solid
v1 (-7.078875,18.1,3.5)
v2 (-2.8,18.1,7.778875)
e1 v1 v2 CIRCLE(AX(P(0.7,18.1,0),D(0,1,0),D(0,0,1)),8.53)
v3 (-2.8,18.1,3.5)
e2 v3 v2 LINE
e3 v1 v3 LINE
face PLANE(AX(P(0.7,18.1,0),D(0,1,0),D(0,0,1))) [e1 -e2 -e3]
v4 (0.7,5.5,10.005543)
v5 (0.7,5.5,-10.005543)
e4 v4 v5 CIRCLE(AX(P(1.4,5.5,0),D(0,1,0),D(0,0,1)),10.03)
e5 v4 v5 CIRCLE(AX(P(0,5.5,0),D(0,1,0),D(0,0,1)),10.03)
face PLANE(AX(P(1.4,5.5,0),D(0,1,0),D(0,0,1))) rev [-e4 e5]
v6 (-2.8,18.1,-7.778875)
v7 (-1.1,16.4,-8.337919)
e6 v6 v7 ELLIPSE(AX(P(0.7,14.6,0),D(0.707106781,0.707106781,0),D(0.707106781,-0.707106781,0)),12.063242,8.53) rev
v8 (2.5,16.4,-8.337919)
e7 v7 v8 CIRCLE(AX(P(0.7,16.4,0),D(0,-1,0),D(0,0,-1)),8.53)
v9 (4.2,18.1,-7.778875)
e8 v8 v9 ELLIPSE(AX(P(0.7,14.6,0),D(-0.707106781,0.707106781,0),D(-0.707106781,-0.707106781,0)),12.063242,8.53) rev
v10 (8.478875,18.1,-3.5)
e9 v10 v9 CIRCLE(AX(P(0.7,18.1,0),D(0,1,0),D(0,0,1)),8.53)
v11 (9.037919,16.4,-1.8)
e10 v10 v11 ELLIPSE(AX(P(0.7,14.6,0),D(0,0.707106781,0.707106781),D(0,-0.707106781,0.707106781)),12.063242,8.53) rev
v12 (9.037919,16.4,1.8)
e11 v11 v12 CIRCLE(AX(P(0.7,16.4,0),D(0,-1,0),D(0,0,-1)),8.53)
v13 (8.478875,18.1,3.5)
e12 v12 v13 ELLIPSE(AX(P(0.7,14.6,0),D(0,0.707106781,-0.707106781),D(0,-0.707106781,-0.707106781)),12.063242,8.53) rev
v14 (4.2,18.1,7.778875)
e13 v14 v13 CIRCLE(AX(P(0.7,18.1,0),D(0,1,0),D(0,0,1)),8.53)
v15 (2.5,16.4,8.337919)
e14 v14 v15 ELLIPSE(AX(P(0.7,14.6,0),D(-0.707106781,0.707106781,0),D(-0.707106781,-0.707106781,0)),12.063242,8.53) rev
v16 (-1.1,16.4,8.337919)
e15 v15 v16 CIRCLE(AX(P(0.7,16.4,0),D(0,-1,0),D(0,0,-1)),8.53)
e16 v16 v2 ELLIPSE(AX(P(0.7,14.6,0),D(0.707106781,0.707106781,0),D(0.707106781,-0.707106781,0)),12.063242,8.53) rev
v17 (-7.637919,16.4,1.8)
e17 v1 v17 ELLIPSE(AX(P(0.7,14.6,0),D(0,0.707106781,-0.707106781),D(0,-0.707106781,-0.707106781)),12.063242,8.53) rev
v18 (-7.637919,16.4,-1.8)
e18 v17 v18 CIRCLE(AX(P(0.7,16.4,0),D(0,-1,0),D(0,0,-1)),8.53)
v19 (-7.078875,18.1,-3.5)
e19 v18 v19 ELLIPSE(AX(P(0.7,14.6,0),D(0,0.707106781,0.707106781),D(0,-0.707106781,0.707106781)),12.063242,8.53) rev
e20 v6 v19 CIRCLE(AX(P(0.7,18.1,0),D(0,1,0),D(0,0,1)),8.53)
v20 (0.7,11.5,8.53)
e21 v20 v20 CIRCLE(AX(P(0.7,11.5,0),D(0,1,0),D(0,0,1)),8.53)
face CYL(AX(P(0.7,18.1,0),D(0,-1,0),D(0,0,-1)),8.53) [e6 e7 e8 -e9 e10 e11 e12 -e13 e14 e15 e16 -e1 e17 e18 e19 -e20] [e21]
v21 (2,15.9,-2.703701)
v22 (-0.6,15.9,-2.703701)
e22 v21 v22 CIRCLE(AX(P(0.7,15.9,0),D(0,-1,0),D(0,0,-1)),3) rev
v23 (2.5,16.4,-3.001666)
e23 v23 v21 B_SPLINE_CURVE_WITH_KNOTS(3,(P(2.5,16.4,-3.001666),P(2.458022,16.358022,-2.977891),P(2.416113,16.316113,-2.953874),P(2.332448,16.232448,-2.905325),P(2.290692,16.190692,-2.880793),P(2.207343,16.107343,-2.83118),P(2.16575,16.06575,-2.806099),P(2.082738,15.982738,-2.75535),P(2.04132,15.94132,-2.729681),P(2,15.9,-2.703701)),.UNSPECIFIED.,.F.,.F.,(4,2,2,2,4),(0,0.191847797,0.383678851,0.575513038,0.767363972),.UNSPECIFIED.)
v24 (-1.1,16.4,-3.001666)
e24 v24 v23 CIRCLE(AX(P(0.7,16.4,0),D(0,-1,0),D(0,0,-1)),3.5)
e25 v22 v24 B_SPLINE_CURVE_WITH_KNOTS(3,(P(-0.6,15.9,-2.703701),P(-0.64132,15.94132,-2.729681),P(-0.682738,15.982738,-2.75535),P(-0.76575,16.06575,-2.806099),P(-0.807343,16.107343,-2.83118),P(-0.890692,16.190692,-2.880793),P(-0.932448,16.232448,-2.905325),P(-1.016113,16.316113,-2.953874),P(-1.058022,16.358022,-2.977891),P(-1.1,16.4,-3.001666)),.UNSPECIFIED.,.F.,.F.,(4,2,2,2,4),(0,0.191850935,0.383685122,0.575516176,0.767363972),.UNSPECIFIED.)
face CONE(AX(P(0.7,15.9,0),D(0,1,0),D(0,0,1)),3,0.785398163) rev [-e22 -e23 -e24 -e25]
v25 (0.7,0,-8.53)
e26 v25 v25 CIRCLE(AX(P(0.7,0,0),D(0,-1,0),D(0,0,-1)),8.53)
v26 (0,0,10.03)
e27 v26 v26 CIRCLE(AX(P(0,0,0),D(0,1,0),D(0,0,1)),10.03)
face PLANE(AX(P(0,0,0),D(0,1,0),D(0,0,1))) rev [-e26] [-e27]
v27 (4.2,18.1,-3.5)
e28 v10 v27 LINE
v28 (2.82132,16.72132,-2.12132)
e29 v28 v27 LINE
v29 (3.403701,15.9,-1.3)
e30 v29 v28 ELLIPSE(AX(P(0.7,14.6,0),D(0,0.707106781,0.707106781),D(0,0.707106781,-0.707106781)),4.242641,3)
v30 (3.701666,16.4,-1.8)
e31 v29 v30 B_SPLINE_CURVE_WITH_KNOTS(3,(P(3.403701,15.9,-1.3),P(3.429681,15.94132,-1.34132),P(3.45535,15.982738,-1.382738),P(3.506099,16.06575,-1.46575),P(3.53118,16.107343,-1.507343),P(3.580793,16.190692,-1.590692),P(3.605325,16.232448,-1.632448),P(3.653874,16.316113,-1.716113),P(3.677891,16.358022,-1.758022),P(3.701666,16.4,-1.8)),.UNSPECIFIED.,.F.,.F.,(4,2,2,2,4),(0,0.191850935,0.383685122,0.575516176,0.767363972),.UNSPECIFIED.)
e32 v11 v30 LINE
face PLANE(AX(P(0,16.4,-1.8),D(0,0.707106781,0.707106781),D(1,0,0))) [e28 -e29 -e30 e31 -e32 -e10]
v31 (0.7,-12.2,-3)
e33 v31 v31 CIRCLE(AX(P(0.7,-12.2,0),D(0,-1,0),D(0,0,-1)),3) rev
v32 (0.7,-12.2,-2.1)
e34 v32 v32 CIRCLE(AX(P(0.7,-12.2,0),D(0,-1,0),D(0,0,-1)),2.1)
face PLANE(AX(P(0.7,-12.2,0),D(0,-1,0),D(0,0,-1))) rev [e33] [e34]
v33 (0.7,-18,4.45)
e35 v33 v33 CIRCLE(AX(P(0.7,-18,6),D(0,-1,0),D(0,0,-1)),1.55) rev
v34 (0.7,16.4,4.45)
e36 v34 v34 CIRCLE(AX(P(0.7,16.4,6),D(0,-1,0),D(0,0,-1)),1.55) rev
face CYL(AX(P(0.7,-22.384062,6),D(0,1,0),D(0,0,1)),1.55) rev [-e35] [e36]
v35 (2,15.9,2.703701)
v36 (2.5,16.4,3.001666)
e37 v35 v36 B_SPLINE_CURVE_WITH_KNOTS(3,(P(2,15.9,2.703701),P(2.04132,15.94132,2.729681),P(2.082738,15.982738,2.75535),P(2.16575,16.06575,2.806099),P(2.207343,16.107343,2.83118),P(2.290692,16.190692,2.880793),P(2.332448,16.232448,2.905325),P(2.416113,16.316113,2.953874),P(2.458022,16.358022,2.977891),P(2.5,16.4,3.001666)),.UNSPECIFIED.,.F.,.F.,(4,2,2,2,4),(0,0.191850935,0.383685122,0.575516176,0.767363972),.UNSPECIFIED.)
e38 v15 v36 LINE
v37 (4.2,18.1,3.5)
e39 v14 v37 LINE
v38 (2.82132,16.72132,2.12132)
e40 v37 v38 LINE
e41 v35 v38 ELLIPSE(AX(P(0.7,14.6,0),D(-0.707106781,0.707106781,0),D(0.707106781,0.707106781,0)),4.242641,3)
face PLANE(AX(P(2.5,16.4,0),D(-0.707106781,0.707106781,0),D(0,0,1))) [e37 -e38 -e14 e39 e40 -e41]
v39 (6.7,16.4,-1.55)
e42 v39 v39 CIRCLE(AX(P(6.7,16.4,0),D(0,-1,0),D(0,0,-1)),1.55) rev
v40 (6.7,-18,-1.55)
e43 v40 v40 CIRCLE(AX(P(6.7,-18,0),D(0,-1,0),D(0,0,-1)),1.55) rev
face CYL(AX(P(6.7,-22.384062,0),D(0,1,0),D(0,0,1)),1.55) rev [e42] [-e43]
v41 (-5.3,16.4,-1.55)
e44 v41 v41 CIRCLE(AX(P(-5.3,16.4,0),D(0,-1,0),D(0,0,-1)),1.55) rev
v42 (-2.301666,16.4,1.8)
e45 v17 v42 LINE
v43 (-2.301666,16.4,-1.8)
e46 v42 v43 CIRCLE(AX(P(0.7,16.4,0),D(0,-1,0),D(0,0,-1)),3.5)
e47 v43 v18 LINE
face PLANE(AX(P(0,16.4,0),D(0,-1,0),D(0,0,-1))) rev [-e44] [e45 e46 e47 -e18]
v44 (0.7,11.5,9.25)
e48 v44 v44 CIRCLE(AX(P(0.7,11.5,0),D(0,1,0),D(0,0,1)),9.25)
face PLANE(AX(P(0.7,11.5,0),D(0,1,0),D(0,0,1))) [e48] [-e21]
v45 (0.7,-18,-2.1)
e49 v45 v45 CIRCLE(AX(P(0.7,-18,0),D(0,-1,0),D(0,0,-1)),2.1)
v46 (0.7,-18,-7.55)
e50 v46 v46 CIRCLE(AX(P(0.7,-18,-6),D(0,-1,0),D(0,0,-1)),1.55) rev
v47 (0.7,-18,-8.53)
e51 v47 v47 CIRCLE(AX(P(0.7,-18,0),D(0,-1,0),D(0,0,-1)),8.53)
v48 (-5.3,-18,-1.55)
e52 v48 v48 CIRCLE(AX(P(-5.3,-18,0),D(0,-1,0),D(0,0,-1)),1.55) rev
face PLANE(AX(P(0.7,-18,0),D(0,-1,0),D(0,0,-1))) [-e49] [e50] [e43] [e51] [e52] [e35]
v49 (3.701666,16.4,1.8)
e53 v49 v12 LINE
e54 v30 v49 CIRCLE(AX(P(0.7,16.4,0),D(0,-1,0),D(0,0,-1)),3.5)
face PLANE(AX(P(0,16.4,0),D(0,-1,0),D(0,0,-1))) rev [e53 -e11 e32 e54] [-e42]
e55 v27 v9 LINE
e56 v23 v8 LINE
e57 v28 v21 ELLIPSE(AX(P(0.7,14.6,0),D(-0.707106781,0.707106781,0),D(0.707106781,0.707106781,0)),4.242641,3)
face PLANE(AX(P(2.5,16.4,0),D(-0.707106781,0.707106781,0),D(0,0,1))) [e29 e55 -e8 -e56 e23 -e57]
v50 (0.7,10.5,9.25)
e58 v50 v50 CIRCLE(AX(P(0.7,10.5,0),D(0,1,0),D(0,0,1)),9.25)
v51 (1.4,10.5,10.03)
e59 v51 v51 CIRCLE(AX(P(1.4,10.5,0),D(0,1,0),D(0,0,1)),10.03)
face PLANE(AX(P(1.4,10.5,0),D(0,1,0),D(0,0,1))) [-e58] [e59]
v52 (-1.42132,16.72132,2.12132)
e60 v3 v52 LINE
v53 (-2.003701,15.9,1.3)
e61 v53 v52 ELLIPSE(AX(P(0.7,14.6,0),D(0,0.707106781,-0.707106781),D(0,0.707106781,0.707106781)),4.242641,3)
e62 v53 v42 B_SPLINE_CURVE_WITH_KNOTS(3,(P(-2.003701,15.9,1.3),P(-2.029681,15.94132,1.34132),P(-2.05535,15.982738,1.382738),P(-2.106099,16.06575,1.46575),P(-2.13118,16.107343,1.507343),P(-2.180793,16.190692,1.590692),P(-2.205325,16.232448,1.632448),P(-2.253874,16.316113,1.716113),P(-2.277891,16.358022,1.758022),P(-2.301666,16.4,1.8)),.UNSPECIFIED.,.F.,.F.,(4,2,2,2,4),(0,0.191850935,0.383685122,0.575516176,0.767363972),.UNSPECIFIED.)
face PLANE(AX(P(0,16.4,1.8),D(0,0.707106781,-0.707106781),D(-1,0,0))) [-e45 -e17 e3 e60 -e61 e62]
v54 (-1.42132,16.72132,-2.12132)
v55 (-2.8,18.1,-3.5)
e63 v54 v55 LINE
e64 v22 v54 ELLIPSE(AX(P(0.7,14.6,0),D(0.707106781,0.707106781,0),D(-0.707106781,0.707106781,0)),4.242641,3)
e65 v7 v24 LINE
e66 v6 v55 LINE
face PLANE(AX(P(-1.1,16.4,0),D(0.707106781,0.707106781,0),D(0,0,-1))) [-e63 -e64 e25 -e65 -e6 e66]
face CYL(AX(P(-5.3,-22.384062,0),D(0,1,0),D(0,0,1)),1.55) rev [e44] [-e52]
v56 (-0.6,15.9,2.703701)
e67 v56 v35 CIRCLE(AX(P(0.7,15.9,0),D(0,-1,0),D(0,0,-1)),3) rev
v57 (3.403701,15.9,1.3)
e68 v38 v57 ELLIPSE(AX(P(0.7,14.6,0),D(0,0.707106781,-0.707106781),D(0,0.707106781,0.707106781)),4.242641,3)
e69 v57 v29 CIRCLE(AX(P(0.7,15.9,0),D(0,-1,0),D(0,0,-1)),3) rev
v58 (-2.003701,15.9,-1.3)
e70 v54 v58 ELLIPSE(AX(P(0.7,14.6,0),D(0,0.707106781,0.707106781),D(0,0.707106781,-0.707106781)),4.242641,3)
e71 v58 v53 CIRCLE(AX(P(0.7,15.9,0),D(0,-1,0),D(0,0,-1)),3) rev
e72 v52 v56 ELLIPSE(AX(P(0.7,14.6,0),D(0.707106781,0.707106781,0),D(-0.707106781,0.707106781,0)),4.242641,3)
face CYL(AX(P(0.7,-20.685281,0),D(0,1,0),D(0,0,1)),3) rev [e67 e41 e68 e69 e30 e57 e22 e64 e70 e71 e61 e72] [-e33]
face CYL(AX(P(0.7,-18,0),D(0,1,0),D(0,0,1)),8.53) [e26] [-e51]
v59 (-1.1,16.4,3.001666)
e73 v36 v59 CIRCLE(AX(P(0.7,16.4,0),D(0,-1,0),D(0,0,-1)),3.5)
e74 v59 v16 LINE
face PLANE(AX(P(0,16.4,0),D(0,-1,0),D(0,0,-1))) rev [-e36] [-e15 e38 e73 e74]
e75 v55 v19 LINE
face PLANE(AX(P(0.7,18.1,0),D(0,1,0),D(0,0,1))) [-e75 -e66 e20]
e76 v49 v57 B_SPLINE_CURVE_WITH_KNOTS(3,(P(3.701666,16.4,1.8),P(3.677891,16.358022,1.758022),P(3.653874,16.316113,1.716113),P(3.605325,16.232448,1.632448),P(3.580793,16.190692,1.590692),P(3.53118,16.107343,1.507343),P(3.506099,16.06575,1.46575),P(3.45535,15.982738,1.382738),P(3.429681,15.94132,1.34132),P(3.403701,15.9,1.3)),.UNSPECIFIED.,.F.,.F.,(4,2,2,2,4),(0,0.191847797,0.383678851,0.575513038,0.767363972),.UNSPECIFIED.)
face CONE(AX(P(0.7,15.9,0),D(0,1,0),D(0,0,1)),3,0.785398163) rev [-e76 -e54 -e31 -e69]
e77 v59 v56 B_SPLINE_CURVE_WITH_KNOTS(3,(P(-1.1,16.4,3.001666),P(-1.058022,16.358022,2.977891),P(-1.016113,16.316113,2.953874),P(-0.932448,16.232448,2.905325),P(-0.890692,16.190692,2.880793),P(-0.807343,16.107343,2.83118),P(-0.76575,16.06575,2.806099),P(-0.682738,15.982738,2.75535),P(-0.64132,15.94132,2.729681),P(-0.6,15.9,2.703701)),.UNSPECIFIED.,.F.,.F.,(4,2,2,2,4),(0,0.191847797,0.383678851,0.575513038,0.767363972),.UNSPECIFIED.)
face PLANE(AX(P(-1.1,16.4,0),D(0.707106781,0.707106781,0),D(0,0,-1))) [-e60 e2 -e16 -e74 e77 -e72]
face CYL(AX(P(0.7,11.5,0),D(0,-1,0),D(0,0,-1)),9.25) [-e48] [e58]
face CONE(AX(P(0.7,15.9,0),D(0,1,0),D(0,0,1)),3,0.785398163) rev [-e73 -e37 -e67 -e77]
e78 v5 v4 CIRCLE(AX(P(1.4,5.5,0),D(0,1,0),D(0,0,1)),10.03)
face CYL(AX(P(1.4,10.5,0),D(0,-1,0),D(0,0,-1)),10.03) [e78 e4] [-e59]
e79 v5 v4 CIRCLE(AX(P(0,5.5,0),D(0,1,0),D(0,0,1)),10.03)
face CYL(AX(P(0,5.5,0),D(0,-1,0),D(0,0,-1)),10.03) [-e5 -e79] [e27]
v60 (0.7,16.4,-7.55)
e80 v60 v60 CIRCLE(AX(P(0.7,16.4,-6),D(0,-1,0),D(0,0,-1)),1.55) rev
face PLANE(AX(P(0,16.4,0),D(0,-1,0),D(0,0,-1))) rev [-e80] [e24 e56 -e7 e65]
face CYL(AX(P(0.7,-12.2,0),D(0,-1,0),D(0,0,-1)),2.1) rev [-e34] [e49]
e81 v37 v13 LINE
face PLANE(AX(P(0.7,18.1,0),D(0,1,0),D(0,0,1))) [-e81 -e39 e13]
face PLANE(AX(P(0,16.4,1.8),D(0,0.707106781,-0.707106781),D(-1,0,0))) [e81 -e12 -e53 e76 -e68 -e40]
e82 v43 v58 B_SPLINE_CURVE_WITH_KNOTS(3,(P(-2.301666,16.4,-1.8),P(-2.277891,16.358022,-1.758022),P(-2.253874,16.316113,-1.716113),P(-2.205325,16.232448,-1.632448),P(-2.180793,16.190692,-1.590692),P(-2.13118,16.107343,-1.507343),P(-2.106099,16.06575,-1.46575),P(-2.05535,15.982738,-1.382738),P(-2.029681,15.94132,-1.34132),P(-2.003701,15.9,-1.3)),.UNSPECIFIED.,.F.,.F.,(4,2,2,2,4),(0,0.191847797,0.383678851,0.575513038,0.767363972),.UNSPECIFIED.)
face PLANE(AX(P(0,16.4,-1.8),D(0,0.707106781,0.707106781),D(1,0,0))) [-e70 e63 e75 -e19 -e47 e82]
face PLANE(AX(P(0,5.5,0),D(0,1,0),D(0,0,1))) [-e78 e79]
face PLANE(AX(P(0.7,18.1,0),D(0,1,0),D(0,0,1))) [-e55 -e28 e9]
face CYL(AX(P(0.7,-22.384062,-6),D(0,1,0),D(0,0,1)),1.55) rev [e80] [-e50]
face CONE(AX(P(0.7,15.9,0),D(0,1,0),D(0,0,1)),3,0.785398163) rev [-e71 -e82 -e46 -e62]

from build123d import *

# Parameters (mm, degrees)
SKETCH1_R            = 10.03
BOSS_EXTRUDE11_DEPTH = 5.5
SKETCH20_R           = 10.03
BOSS_EXTRUDE12_DEPTH = 5
SKETCH21_R           = 9.25
BOSS_EXTRUDE13_DEPTH = 1
SKETCH22_R           = 8.53
BOSS_EXTRUDE14_DEPTH = 6.6
BOSS_EXTRUDE15_START = 18
SKETCH30_R           = 8.53
BOSS_EXTRUDE15_DEPTH = 18
SKETCH31_R           = 1.55
CUT_EXTRUDE12_DEPTH  = 36.1
SKETCH33_R           = 2.1
CUT_EXTRUDE14_DEPTH  = 5.8
SKETCH36_R           = 3
CUT_EXTRUDE18_DEPTH  = 30.3
SKETCH37_W           = 9.5
SKETCH37_H           = 7
CUT_EXTRUDE19_DEPTH  = 1.7
CIRPATTERN1_COUNT    = 4
CHAMFER1_SIZE        = 1.7
CHAMFER2_SIZE        = 0.5


with BuildPart() as part:
    # Sketch1 → Boss-Extrude11 (new body)
    with BuildSketch(Plane(origin=(0, 0, 0), x_dir=(1, 0, 0), z_dir=(0, 1, 0))):
        with Locations(Location((0, 0, 0), (0, 0, 270))):
            Circle(SKETCH1_R)
    extrude(amount=BOSS_EXTRUDE11_DEPTH)

    # Sketch20 → Boss-Extrude12 (add)
    with BuildSketch(Plane(origin=(0, 5.5, 0), x_dir=(1, 0, 0), z_dir=(0, 1, 0))):
        with Locations(Location((1.4, 0, 0), (0, 0, 94.001961682))):
            Circle(SKETCH20_R)
    extrude(amount=BOSS_EXTRUDE12_DEPTH)

    # Sketch21 → Boss-Extrude13 (add)
    with BuildSketch(Plane(origin=(0, 10.5, 0), x_dir=(1, 0, 0), z_dir=(0, 1, 0))):
        with Locations(Location((0.7, 0, 0), (0, 0, 270))):
            Circle(SKETCH21_R)
    extrude(amount=BOSS_EXTRUDE13_DEPTH)

    # Sketch22 → Boss-Extrude14 (add)
    with BuildSketch(Plane(origin=(0, 11.5, 0), x_dir=(1, 0, 0), z_dir=(0, 1, 0))):
        with Locations(Location((0.7, 0, 0), (0, 0, 270))):
            Circle(SKETCH22_R)
    extrude(amount=BOSS_EXTRUDE14_DEPTH)

    # Sketch30 → Boss-Extrude15 (add)
    with BuildSketch(Plane.XZ.offset(BOSS_EXTRUDE15_START)):
        with Locations(Location((0.7, 0, 0), (0, 0, 90))):
            Circle(SKETCH30_R)
    extrude(amount=-BOSS_EXTRUDE15_DEPTH)

    # Sketch31 → Cut-Extrude12 (cut)
    with BuildSketch(Plane(origin=(0, 18.1, 0), x_dir=(1, 0, 0), z_dir=(0, 1, 0))):
        with Locations(Location((6.7, 0, 0), (0, 0, 270))):
            Circle(SKETCH31_R)
    cut_extrude12 = extrude(amount=-CUT_EXTRUDE12_DEPTH, mode=Mode.SUBTRACT)

    # Sketch33 → Cut-Extrude14 (cut)
    with BuildSketch(Plane.XZ.offset(18)):
        with Locations(Location((0.7, 0, 0), (0, 0, 270))):
            Circle(SKETCH33_R)
    extrude(amount=-CUT_EXTRUDE14_DEPTH, mode=Mode.SUBTRACT)

    # Sketch36 → Cut-Extrude18 (cut)
    with BuildSketch(Plane(origin=(0, 18.1, 0), x_dir=(1, 0, 0), z_dir=(0, 1, 0))):
        with Locations(Location((0.7, 0, 0), (0, 0, 270))):
            Circle(SKETCH36_R)
    extrude(amount=-CUT_EXTRUDE18_DEPTH, mode=Mode.SUBTRACT)

    # Sketch37 → Cut-Extrude19 (cut)
    with BuildSketch(Plane(origin=(0, 18.1, 0), x_dir=(1, 0, 0), z_dir=(0, 1, 0))):
        with Locations((5.45, 0)):
            Rectangle(SKETCH37_W, SKETCH37_H)
    cut_extrude19 = extrude(amount=-CUT_EXTRUDE19_DEPTH, mode=Mode.SUBTRACT)

    # CirPattern1: Cut-Extrude12, Cut-Extrude19 ×4 about axis
    cirpattern1_axis = Axis((0.7, 0, 0), (0, 1, 0))
    add([cut_extrude12.rotate(cirpattern1_axis, i * 360 / CIRPATTERN1_COUNT) for i in range(1, CIRPATTERN1_COUNT)], mode=Mode.SUBTRACT)
    add([cut_extrude19.rotate(cirpattern1_axis, i * 360 / CIRPATTERN1_COUNT) for i in range(1, CIRPATTERN1_COUNT)], mode=Mode.SUBTRACT)

    # Chamfer1
    # the kernel refuses this chamfer: 1.7 mm, written as the material it adds along each edge
    with BuildSketch(Plane(origin=(12.85073632, 16.4, -3.5), x_dir=(0, 0.9996219169112968, -0.027495876610586365), z_dir=(-1, 0, 0))) as chamfer1_piece_1_section:
        Polygon((CHAMFER1_SIZE * 0.999621916911, -CHAMFER1_SIZE * 0.0274958766106), (-CHAMFER1_SIZE * 0.0274958766106, -CHAMFER1_SIZE * 0.999621916911), (0, 0), align=None)
    chamfer1_piece_1 = extrude(amount=8.65073632, mode=Mode.PRIVATE)
    chamfer1_piece_1 = chamfer1_piece_1 & Plane(origin=(0.7, 16.951076754, 0), x_dir=(0, 0, 1), z_dir=(0, -1, 0)) * Cylinder(8.53, 25, mode=Mode.PRIVATE)
    chamfer1_piece_1 = split(chamfer1_piece_1, bisect_by=Plane(origin=(6.450066767, 18.1, -2.924017163), z_dir=(0, -1, 0)), keep=Keep.TOP, mode=Mode.PRIVATE)
    add(chamfer1_piece_1)
    with BuildSketch(Plane(origin=(4.2, 16.4, 3.5), x_dir=(0, 0.9996219169112968, 0.027495876610581792), z_dir=(1, 0, 0))) as chamfer1_piece_2_section:
        Polygon((CHAMFER1_SIZE * 0.999621916911, -CHAMFER1_SIZE * 0.0274958766106), (-CHAMFER1_SIZE * 0.0274958766106, -CHAMFER1_SIZE * 0.999621916911), (0, 0), align=None)
    chamfer1_piece_2 = extrude(amount=8.65073632, mode=Mode.PRIVATE)
    chamfer1_piece_2 = chamfer1_piece_2 & Plane(origin=(0.7, 16.951076754, 0), x_dir=(0, 0, 1), z_dir=(0, -1, 0)) * Cylinder(8.53, 25, mode=Mode.PRIVATE)
    chamfer1_piece_2 = split(chamfer1_piece_2, bisect_by=Plane(origin=(6.450066768, 18.1, 2.924017163), z_dir=(0, -1, 0)), keep=Keep.TOP, mode=Mode.PRIVATE)
    add(chamfer1_piece_2)
    with BuildSketch(Plane(origin=(-2.8, 16.4, -12.15073632), x_dir=(-0.027495876610586365, 0.9996219169112968, 0), z_dir=(0, 0, 1))) as chamfer1_piece_3_section:
        Polygon((CHAMFER1_SIZE * 0.999621916911, -CHAMFER1_SIZE * 0.0274958766106), (-CHAMFER1_SIZE * 0.0274958766106, -CHAMFER1_SIZE * 0.999621916911), (0, 0), align=None)
    chamfer1_piece_3 = extrude(amount=8.65073632, mode=Mode.PRIVATE)
    chamfer1_piece_3 = chamfer1_piece_3 & Plane(origin=(0.7, 16.951076754, 0), x_dir=(0, 0, 1), z_dir=(0, -1, 0)) * Cylinder(8.53, 25, mode=Mode.PRIVATE)
    chamfer1_piece_3 = split(chamfer1_piece_3, bisect_by=Plane(origin=(-2.224017163, 18.1, -5.750066767), z_dir=(0, -1, 0)), keep=Keep.TOP, mode=Mode.PRIVATE)
    add(chamfer1_piece_3)
    with BuildSketch(Plane(origin=(-2.8, 16.4, -3.5), x_dir=(0, 0.9996219169112968, -0.027495876610586365), z_dir=(-1, 0, 0))) as chamfer1_piece_4_section:
        Polygon((CHAMFER1_SIZE * 0.999621916911, -CHAMFER1_SIZE * 0.0274958766106), (-CHAMFER1_SIZE * 0.0274958766106, -CHAMFER1_SIZE * 0.999621916911), (0, 0), align=None)
    chamfer1_piece_4 = extrude(amount=8.65073632, mode=Mode.PRIVATE)
    chamfer1_piece_4 = chamfer1_piece_4 & Plane(origin=(0.7, 16.951076754, 0), x_dir=(0, 0, 1), z_dir=(0, -1, 0)) * Cylinder(8.53, 25, mode=Mode.PRIVATE)
    chamfer1_piece_4 = split(chamfer1_piece_4, bisect_by=Plane(origin=(-5.050066768, 18.1, -2.924017163), z_dir=(0, -1, 0)), keep=Keep.TOP, mode=Mode.PRIVATE)
    add(chamfer1_piece_4)
    with BuildSketch(Plane(origin=(-11.45073632, 16.4, 3.5), x_dir=(0, 0.9996219169112968, 0.027495876610586365), z_dir=(1, 0, 0))) as chamfer1_piece_5_section:
        Polygon((CHAMFER1_SIZE * 0.999621916911, -CHAMFER1_SIZE * 0.0274958766106), (-CHAMFER1_SIZE * 0.0274958766106, -CHAMFER1_SIZE * 0.999621916911), (0, 0), align=None)
    chamfer1_piece_5 = extrude(amount=8.65073632, mode=Mode.PRIVATE)
    chamfer1_piece_5 = chamfer1_piece_5 & Plane(origin=(0.7, 16.951076754, 0), x_dir=(0, 0, 1), z_dir=(0, -1, 0)) * Cylinder(8.53, 25, mode=Mode.PRIVATE)
    chamfer1_piece_5 = split(chamfer1_piece_5, bisect_by=Plane(origin=(-5.050066767, 18.1, 2.924017163), z_dir=(0, -1, 0)), keep=Keep.TOP, mode=Mode.PRIVATE)
    add(chamfer1_piece_5)
    with BuildSketch(Plane(origin=(-2.8, 16.4, 3.5), x_dir=(-0.027495876610586365, 0.9996219169112968, 0), z_dir=(0, 0, 1))) as chamfer1_piece_6_section:
        Polygon((CHAMFER1_SIZE * 0.999621916911, -CHAMFER1_SIZE * 0.0274958766106), (-CHAMFER1_SIZE * 0.0274958766106, -CHAMFER1_SIZE * 0.999621916911), (0, 0), align=None)
    chamfer1_piece_6 = extrude(amount=8.65073632, mode=Mode.PRIVATE)
    chamfer1_piece_6 = chamfer1_piece_6 & Plane(origin=(0.7, 16.951076754, 0), x_dir=(0, 0, 1), z_dir=(0, -1, 0)) * Cylinder(8.53, 25, mode=Mode.PRIVATE)
    chamfer1_piece_6 = split(chamfer1_piece_6, bisect_by=Plane(origin=(-2.224017163, 18.1, 5.750066768), z_dir=(0, -1, 0)), keep=Keep.TOP, mode=Mode.PRIVATE)
    add(chamfer1_piece_6)
    with BuildSketch(Plane(origin=(4.2, 16.4, 12.15073632), x_dir=(0.027495876610586365, 0.9996219169112968, 0), z_dir=(0, 0, -1))) as chamfer1_piece_7_section:
        Polygon((CHAMFER1_SIZE * 0.999621916911, -CHAMFER1_SIZE * 0.0274958766106), (-CHAMFER1_SIZE * 0.0274958766106, -CHAMFER1_SIZE * 0.999621916911), (0, 0), align=None)
    chamfer1_piece_7 = extrude(amount=8.65073632, mode=Mode.PRIVATE)
    chamfer1_piece_7 = chamfer1_piece_7 & Plane(origin=(0.7, 16.951076754, 0), x_dir=(0, 0, 1), z_dir=(0, -1, 0)) * Cylinder(8.53, 25, mode=Mode.PRIVATE)
    chamfer1_piece_7 = split(chamfer1_piece_7, bisect_by=Plane(origin=(3.624017163, 18.1, 5.750066767), z_dir=(0, -1, 0)), keep=Keep.TOP, mode=Mode.PRIVATE)
    add(chamfer1_piece_7)
    with BuildSketch(Plane(origin=(4.2, 16.4, -3.5), x_dir=(0.027495876610586365, 0.9996219169112968, 0), z_dir=(0, 0, -1))) as chamfer1_piece_8_section:
        Polygon((CHAMFER1_SIZE * 0.999621916911, -CHAMFER1_SIZE * 0.0274958766106), (-CHAMFER1_SIZE * 0.0274958766106, -CHAMFER1_SIZE * 0.999621916911), (0, 0), align=None)
    chamfer1_piece_8 = extrude(amount=8.65073632, mode=Mode.PRIVATE)
    chamfer1_piece_8 = chamfer1_piece_8 & Plane(origin=(0.7, 16.951076754, 0), x_dir=(0, 0, 1), z_dir=(0, -1, 0)) * Cylinder(8.53, 25, mode=Mode.PRIVATE)
    chamfer1_piece_8 = split(chamfer1_piece_8, bisect_by=Plane(origin=(3.624017163, 18.1, -5.750066768), z_dir=(0, -1, 0)), keep=Keep.TOP, mode=Mode.PRIVATE)
    add(chamfer1_piece_8)
    with BuildSketch(Plane(origin=(12.85073632, 16.4, -3.5), x_dir=(0, 0.9996219169112968, -0.027495876610586365), z_dir=(-1, 0, 0))) as chamfer1_piece_9a_section:
        Polygon((CHAMFER1_SIZE * 0.999621916911, -CHAMFER1_SIZE * 0.0274958766106), (-CHAMFER1_SIZE * 0.0274958766106, -CHAMFER1_SIZE * 0.999621916911), (0, 0), align=None)
    chamfer1_piece_9a = extrude(amount=13.022597399, mode=Mode.PRIVATE)
    chamfer1_piece_9a = split(chamfer1_piece_9a, bisect_by=Plane(origin=(2.33024723, 18.1, -3.085534958), z_dir=(0, -1, 0)), keep=Keep.TOP, mode=Mode.PRIVATE)
    chamfer1_piece_9a = split(chamfer1_piece_9a, bisect_by=Plane(origin=(4.2, 17.035605809, -3.085534958), z_dir=(-1, 0, 0)), keep=Keep.TOP, mode=Mode.PRIVATE)
    chamfer1_piece_9a = chamfer1_piece_9a - Plane(origin=(0.7, 17.035605809, 0), x_dir=(0, 0, 1), z_dir=(0, 1, 0)) * Cylinder(3, 33, mode=Mode.PRIVATE)
    with BuildSketch(Plane(origin=(4.2, 16.4, 0.87186108), x_dir=(0.027495876610586365, 0.9996219169112968, 0), z_dir=(0, 0, -1))) as chamfer1_piece_9b_section:
        Polygon((CHAMFER1_SIZE * 0.999621916911, -CHAMFER1_SIZE * 0.0274958766106), (-CHAMFER1_SIZE * 0.0274958766106, -CHAMFER1_SIZE * 0.999621916911), (0, 0), align=None)
    chamfer1_piece_9b = extrude(amount=13.022597399, mode=Mode.PRIVATE)
    chamfer1_piece_9b = split(chamfer1_piece_9b, bisect_by=Plane(origin=(3.785535078, 17.035605902, -3.5), z_dir=(0, 0, 1)), keep=Keep.TOP, mode=Mode.PRIVATE)
    chamfer1_piece_9b = split(chamfer1_piece_9b, bisect_by=Plane(origin=(3.785535078, 18.1, -1.630247283), z_dir=(0, -1, 0)), keep=Keep.TOP, mode=Mode.PRIVATE)
    chamfer1_piece_9b = chamfer1_piece_9b - Plane(origin=(0.7, 17.035605902, 0), x_dir=(0, 0, 1), z_dir=(0, 1, 0)) * Cylinder(3, 33, mode=Mode.PRIVATE)
    chamfer1_piece_9 = chamfer1_piece_9a & chamfer1_piece_9b
    add(chamfer1_piece_9)
    with BuildSketch(Plane(origin=(4.2, 16.4, 12.15073632), x_dir=(0.027495876610586365, 0.9996219169112968, 0), z_dir=(0, 0, -1))) as chamfer1_piece_10a_section:
        Polygon((CHAMFER1_SIZE * 0.999621916911, -CHAMFER1_SIZE * 0.0274958766106), (-CHAMFER1_SIZE * 0.0274958766106, -CHAMFER1_SIZE * 0.999621916911), (0, 0), align=None)
    chamfer1_piece_10a = extrude(amount=13.022597399, mode=Mode.PRIVATE)
    chamfer1_piece_10a = split(chamfer1_piece_10a, bisect_by=Plane(origin=(3.785534958, 18.1, 1.63024723), z_dir=(0, -1, 0)), keep=Keep.TOP, mode=Mode.PRIVATE)
    chamfer1_piece_10a = split(chamfer1_piece_10a, bisect_by=Plane(origin=(3.785534958, 17.035605809, 3.5), z_dir=(0, 0, -1)), keep=Keep.TOP, mode=Mode.PRIVATE)
    chamfer1_piece_10a = chamfer1_piece_10a - Plane(origin=(0.7, 17.035605809, 0), x_dir=(0, 0, 1), z_dir=(0, 1, 0)) * Cylinder(3, 33, mode=Mode.PRIVATE)
    with BuildSketch(Plane(origin=(-0.17186108, 16.4, 3.5), x_dir=(0, 0.9996219169112968, 0.027495876610586365), z_dir=(1, 0, 0))) as chamfer1_piece_10b_section:
        Polygon((CHAMFER1_SIZE * 0.999621916911, -CHAMFER1_SIZE * 0.0274958766106), (-CHAMFER1_SIZE * 0.0274958766106, -CHAMFER1_SIZE * 0.999621916911), (0, 0), align=None)
    chamfer1_piece_10b = extrude(amount=13.022597399, mode=Mode.PRIVATE)
    chamfer1_piece_10b = split(chamfer1_piece_10b, bisect_by=Plane(origin=(4.2, 17.035605903, 3.08553508), z_dir=(-1, 0, 0)), keep=Keep.TOP, mode=Mode.PRIVATE)
    chamfer1_piece_10b = split(chamfer1_piece_10b, bisect_by=Plane(origin=(2.330247274, 18.1, 3.08553508), z_dir=(0, -1, 0)), keep=Keep.TOP, mode=Mode.PRIVATE)
    chamfer1_piece_10b = chamfer1_piece_10b - Plane(origin=(0.7, 17.035605903, 0), x_dir=(0, 0, 1), z_dir=(0, 1, 0)) * Cylinder(3, 33, mode=Mode.PRIVATE)
    chamfer1_piece_10 = chamfer1_piece_10a & chamfer1_piece_10b
    add(chamfer1_piece_10)
    with BuildSketch(Plane(origin=(-2.8, 16.4, -12.15073632), x_dir=(-0.027495876610586365, 0.9996219169112968, 0), z_dir=(0, 0, 1))) as chamfer1_piece_11a_section:
        Polygon((CHAMFER1_SIZE * 0.999621916911, -CHAMFER1_SIZE * 0.0274958766106), (-CHAMFER1_SIZE * 0.0274958766106, -CHAMFER1_SIZE * 0.999621916911), (0, 0), align=None)
    chamfer1_piece_11a = extrude(amount=13.022597399, mode=Mode.PRIVATE)
    chamfer1_piece_11a = split(chamfer1_piece_11a, bisect_by=Plane(origin=(-2.385534958, 18.1, -1.63024723), z_dir=(0, -1, 0)), keep=Keep.TOP, mode=Mode.PRIVATE)
    chamfer1_piece_11a = split(chamfer1_piece_11a, bisect_by=Plane(origin=(-2.385534958, 17.035605809, -3.5), z_dir=(0, 0, 1)), keep=Keep.TOP, mode=Mode.PRIVATE)
    chamfer1_piece_11a = chamfer1_piece_11a - Plane(origin=(0.7, 17.035605809, 0), x_dir=(0, 0, 1), z_dir=(0, 1, 0)) * Cylinder(3, 33, mode=Mode.PRIVATE)
    with BuildSketch(Plane(origin=(1.57186108, 16.4, -3.5), x_dir=(0, 0.9996219169112968, -0.027495876610586365), z_dir=(-1, 0, 0))) as chamfer1_piece_11b_section:
        Polygon((CHAMFER1_SIZE * 0.999621916911, -CHAMFER1_SIZE * 0.0274958766106), (-CHAMFER1_SIZE * 0.0274958766106, -CHAMFER1_SIZE * 0.999621916911), (0, 0), align=None)
    chamfer1_piece_11b = extrude(amount=13.022597399, mode=Mode.PRIVATE)
    chamfer1_piece_11b = split(chamfer1_piece_11b, bisect_by=Plane(origin=(-2.8, 17.035605902, -3.085535078), z_dir=(1, 0, 0)), keep=Keep.TOP, mode=Mode.PRIVATE)
    chamfer1_piece_11b = split(chamfer1_piece_11b, bisect_by=Plane(origin=(-0.930247283, 18.1, -3.085535078), z_dir=(0, -1, 0)), keep=Keep.TOP, mode=Mode.PRIVATE)
    chamfer1_piece_11b = chamfer1_piece_11b - Plane(origin=(0.7, 17.035605902, 0), x_dir=(0, 0, 1), z_dir=(0, 1, 0)) * Cylinder(3, 33, mode=Mode.PRIVATE)
    chamfer1_piece_11 = chamfer1_piece_11a & chamfer1_piece_11b
    add(chamfer1_piece_11)
    with BuildSketch(Plane(origin=(-11.45073632, 16.4, 3.5), x_dir=(0, 0.9996219169112968, 0.027495876610586365), z_dir=(1, 0, 0))) as chamfer1_piece_12a_section:
        Polygon((CHAMFER1_SIZE * 0.999621916911, -CHAMFER1_SIZE * 0.0274958766106), (-CHAMFER1_SIZE * 0.0274958766106, -CHAMFER1_SIZE * 0.999621916911), (0, 0), align=None)
    chamfer1_piece_12a = extrude(amount=13.022597399, mode=Mode.PRIVATE)
    chamfer1_piece_12a = split(chamfer1_piece_12a, bisect_by=Plane(origin=(-0.930247276, 18.1, 3.08553506), z_dir=(0, -1, 0)), keep=Keep.TOP, mode=Mode.PRIVATE)
    chamfer1_piece_12a = split(chamfer1_piece_12a, bisect_by=Plane(origin=(-2.8, 17.035605889, 3.08553506), z_dir=(1, 0, 0)), keep=Keep.TOP, mode=Mode.PRIVATE)
    chamfer1_piece_12a = chamfer1_piece_12a - Plane(origin=(0.7, 17.035605889, 0), x_dir=(0, 0, 1), z_dir=(0, 1, 0)) * Cylinder(3, 33, mode=Mode.PRIVATE)
    with BuildSketch(Plane(origin=(-2.8, 16.4, -0.87186108), x_dir=(-0.027495876610586365, 0.9996219169112968, 0), z_dir=(0, 0, 1))) as chamfer1_piece_12b_section:
        Polygon((CHAMFER1_SIZE * 0.999621916911, -CHAMFER1_SIZE * 0.0274958766106), (-CHAMFER1_SIZE * 0.0274958766106, -CHAMFER1_SIZE * 0.999621916911), (0, 0), align=None)
    chamfer1_piece_12b = extrude(amount=13.022597399, mode=Mode.PRIVATE)
    chamfer1_piece_12b = split(chamfer1_piece_12b, bisect_by=Plane(origin=(-2.385535078, 17.035605902, 3.5), z_dir=(0, 0, -1)), keep=Keep.TOP, mode=Mode.PRIVATE)
    chamfer1_piece_12b = split(chamfer1_piece_12b, bisect_by=Plane(origin=(-2.385535078, 18.1, 1.630247283), z_dir=(0, -1, 0)), keep=Keep.TOP, mode=Mode.PRIVATE)
    chamfer1_piece_12b = chamfer1_piece_12b - Plane(origin=(0.7, 17.035605902, 0), x_dir=(0, 0, 1), z_dir=(0, 1, 0)) * Cylinder(3, 33, mode=Mode.PRIVATE)
    chamfer1_piece_12 = chamfer1_piece_12a & chamfer1_piece_12b
    add(chamfer1_piece_12)

    # Chamfer2
    chamfer2_edges = [part.edges().sort_by_distance(p)[0] for p in [
        (-2.3, 16.4, 0),
        (1.648683298, 16.4, 2.846049894),
        (3.7, 16.4, 0),
        (0.7, 16.4, -3),
    ]]
    chamfer(chamfer2_edges, length=CHAMFER2_SIZE)


solid = part.part
